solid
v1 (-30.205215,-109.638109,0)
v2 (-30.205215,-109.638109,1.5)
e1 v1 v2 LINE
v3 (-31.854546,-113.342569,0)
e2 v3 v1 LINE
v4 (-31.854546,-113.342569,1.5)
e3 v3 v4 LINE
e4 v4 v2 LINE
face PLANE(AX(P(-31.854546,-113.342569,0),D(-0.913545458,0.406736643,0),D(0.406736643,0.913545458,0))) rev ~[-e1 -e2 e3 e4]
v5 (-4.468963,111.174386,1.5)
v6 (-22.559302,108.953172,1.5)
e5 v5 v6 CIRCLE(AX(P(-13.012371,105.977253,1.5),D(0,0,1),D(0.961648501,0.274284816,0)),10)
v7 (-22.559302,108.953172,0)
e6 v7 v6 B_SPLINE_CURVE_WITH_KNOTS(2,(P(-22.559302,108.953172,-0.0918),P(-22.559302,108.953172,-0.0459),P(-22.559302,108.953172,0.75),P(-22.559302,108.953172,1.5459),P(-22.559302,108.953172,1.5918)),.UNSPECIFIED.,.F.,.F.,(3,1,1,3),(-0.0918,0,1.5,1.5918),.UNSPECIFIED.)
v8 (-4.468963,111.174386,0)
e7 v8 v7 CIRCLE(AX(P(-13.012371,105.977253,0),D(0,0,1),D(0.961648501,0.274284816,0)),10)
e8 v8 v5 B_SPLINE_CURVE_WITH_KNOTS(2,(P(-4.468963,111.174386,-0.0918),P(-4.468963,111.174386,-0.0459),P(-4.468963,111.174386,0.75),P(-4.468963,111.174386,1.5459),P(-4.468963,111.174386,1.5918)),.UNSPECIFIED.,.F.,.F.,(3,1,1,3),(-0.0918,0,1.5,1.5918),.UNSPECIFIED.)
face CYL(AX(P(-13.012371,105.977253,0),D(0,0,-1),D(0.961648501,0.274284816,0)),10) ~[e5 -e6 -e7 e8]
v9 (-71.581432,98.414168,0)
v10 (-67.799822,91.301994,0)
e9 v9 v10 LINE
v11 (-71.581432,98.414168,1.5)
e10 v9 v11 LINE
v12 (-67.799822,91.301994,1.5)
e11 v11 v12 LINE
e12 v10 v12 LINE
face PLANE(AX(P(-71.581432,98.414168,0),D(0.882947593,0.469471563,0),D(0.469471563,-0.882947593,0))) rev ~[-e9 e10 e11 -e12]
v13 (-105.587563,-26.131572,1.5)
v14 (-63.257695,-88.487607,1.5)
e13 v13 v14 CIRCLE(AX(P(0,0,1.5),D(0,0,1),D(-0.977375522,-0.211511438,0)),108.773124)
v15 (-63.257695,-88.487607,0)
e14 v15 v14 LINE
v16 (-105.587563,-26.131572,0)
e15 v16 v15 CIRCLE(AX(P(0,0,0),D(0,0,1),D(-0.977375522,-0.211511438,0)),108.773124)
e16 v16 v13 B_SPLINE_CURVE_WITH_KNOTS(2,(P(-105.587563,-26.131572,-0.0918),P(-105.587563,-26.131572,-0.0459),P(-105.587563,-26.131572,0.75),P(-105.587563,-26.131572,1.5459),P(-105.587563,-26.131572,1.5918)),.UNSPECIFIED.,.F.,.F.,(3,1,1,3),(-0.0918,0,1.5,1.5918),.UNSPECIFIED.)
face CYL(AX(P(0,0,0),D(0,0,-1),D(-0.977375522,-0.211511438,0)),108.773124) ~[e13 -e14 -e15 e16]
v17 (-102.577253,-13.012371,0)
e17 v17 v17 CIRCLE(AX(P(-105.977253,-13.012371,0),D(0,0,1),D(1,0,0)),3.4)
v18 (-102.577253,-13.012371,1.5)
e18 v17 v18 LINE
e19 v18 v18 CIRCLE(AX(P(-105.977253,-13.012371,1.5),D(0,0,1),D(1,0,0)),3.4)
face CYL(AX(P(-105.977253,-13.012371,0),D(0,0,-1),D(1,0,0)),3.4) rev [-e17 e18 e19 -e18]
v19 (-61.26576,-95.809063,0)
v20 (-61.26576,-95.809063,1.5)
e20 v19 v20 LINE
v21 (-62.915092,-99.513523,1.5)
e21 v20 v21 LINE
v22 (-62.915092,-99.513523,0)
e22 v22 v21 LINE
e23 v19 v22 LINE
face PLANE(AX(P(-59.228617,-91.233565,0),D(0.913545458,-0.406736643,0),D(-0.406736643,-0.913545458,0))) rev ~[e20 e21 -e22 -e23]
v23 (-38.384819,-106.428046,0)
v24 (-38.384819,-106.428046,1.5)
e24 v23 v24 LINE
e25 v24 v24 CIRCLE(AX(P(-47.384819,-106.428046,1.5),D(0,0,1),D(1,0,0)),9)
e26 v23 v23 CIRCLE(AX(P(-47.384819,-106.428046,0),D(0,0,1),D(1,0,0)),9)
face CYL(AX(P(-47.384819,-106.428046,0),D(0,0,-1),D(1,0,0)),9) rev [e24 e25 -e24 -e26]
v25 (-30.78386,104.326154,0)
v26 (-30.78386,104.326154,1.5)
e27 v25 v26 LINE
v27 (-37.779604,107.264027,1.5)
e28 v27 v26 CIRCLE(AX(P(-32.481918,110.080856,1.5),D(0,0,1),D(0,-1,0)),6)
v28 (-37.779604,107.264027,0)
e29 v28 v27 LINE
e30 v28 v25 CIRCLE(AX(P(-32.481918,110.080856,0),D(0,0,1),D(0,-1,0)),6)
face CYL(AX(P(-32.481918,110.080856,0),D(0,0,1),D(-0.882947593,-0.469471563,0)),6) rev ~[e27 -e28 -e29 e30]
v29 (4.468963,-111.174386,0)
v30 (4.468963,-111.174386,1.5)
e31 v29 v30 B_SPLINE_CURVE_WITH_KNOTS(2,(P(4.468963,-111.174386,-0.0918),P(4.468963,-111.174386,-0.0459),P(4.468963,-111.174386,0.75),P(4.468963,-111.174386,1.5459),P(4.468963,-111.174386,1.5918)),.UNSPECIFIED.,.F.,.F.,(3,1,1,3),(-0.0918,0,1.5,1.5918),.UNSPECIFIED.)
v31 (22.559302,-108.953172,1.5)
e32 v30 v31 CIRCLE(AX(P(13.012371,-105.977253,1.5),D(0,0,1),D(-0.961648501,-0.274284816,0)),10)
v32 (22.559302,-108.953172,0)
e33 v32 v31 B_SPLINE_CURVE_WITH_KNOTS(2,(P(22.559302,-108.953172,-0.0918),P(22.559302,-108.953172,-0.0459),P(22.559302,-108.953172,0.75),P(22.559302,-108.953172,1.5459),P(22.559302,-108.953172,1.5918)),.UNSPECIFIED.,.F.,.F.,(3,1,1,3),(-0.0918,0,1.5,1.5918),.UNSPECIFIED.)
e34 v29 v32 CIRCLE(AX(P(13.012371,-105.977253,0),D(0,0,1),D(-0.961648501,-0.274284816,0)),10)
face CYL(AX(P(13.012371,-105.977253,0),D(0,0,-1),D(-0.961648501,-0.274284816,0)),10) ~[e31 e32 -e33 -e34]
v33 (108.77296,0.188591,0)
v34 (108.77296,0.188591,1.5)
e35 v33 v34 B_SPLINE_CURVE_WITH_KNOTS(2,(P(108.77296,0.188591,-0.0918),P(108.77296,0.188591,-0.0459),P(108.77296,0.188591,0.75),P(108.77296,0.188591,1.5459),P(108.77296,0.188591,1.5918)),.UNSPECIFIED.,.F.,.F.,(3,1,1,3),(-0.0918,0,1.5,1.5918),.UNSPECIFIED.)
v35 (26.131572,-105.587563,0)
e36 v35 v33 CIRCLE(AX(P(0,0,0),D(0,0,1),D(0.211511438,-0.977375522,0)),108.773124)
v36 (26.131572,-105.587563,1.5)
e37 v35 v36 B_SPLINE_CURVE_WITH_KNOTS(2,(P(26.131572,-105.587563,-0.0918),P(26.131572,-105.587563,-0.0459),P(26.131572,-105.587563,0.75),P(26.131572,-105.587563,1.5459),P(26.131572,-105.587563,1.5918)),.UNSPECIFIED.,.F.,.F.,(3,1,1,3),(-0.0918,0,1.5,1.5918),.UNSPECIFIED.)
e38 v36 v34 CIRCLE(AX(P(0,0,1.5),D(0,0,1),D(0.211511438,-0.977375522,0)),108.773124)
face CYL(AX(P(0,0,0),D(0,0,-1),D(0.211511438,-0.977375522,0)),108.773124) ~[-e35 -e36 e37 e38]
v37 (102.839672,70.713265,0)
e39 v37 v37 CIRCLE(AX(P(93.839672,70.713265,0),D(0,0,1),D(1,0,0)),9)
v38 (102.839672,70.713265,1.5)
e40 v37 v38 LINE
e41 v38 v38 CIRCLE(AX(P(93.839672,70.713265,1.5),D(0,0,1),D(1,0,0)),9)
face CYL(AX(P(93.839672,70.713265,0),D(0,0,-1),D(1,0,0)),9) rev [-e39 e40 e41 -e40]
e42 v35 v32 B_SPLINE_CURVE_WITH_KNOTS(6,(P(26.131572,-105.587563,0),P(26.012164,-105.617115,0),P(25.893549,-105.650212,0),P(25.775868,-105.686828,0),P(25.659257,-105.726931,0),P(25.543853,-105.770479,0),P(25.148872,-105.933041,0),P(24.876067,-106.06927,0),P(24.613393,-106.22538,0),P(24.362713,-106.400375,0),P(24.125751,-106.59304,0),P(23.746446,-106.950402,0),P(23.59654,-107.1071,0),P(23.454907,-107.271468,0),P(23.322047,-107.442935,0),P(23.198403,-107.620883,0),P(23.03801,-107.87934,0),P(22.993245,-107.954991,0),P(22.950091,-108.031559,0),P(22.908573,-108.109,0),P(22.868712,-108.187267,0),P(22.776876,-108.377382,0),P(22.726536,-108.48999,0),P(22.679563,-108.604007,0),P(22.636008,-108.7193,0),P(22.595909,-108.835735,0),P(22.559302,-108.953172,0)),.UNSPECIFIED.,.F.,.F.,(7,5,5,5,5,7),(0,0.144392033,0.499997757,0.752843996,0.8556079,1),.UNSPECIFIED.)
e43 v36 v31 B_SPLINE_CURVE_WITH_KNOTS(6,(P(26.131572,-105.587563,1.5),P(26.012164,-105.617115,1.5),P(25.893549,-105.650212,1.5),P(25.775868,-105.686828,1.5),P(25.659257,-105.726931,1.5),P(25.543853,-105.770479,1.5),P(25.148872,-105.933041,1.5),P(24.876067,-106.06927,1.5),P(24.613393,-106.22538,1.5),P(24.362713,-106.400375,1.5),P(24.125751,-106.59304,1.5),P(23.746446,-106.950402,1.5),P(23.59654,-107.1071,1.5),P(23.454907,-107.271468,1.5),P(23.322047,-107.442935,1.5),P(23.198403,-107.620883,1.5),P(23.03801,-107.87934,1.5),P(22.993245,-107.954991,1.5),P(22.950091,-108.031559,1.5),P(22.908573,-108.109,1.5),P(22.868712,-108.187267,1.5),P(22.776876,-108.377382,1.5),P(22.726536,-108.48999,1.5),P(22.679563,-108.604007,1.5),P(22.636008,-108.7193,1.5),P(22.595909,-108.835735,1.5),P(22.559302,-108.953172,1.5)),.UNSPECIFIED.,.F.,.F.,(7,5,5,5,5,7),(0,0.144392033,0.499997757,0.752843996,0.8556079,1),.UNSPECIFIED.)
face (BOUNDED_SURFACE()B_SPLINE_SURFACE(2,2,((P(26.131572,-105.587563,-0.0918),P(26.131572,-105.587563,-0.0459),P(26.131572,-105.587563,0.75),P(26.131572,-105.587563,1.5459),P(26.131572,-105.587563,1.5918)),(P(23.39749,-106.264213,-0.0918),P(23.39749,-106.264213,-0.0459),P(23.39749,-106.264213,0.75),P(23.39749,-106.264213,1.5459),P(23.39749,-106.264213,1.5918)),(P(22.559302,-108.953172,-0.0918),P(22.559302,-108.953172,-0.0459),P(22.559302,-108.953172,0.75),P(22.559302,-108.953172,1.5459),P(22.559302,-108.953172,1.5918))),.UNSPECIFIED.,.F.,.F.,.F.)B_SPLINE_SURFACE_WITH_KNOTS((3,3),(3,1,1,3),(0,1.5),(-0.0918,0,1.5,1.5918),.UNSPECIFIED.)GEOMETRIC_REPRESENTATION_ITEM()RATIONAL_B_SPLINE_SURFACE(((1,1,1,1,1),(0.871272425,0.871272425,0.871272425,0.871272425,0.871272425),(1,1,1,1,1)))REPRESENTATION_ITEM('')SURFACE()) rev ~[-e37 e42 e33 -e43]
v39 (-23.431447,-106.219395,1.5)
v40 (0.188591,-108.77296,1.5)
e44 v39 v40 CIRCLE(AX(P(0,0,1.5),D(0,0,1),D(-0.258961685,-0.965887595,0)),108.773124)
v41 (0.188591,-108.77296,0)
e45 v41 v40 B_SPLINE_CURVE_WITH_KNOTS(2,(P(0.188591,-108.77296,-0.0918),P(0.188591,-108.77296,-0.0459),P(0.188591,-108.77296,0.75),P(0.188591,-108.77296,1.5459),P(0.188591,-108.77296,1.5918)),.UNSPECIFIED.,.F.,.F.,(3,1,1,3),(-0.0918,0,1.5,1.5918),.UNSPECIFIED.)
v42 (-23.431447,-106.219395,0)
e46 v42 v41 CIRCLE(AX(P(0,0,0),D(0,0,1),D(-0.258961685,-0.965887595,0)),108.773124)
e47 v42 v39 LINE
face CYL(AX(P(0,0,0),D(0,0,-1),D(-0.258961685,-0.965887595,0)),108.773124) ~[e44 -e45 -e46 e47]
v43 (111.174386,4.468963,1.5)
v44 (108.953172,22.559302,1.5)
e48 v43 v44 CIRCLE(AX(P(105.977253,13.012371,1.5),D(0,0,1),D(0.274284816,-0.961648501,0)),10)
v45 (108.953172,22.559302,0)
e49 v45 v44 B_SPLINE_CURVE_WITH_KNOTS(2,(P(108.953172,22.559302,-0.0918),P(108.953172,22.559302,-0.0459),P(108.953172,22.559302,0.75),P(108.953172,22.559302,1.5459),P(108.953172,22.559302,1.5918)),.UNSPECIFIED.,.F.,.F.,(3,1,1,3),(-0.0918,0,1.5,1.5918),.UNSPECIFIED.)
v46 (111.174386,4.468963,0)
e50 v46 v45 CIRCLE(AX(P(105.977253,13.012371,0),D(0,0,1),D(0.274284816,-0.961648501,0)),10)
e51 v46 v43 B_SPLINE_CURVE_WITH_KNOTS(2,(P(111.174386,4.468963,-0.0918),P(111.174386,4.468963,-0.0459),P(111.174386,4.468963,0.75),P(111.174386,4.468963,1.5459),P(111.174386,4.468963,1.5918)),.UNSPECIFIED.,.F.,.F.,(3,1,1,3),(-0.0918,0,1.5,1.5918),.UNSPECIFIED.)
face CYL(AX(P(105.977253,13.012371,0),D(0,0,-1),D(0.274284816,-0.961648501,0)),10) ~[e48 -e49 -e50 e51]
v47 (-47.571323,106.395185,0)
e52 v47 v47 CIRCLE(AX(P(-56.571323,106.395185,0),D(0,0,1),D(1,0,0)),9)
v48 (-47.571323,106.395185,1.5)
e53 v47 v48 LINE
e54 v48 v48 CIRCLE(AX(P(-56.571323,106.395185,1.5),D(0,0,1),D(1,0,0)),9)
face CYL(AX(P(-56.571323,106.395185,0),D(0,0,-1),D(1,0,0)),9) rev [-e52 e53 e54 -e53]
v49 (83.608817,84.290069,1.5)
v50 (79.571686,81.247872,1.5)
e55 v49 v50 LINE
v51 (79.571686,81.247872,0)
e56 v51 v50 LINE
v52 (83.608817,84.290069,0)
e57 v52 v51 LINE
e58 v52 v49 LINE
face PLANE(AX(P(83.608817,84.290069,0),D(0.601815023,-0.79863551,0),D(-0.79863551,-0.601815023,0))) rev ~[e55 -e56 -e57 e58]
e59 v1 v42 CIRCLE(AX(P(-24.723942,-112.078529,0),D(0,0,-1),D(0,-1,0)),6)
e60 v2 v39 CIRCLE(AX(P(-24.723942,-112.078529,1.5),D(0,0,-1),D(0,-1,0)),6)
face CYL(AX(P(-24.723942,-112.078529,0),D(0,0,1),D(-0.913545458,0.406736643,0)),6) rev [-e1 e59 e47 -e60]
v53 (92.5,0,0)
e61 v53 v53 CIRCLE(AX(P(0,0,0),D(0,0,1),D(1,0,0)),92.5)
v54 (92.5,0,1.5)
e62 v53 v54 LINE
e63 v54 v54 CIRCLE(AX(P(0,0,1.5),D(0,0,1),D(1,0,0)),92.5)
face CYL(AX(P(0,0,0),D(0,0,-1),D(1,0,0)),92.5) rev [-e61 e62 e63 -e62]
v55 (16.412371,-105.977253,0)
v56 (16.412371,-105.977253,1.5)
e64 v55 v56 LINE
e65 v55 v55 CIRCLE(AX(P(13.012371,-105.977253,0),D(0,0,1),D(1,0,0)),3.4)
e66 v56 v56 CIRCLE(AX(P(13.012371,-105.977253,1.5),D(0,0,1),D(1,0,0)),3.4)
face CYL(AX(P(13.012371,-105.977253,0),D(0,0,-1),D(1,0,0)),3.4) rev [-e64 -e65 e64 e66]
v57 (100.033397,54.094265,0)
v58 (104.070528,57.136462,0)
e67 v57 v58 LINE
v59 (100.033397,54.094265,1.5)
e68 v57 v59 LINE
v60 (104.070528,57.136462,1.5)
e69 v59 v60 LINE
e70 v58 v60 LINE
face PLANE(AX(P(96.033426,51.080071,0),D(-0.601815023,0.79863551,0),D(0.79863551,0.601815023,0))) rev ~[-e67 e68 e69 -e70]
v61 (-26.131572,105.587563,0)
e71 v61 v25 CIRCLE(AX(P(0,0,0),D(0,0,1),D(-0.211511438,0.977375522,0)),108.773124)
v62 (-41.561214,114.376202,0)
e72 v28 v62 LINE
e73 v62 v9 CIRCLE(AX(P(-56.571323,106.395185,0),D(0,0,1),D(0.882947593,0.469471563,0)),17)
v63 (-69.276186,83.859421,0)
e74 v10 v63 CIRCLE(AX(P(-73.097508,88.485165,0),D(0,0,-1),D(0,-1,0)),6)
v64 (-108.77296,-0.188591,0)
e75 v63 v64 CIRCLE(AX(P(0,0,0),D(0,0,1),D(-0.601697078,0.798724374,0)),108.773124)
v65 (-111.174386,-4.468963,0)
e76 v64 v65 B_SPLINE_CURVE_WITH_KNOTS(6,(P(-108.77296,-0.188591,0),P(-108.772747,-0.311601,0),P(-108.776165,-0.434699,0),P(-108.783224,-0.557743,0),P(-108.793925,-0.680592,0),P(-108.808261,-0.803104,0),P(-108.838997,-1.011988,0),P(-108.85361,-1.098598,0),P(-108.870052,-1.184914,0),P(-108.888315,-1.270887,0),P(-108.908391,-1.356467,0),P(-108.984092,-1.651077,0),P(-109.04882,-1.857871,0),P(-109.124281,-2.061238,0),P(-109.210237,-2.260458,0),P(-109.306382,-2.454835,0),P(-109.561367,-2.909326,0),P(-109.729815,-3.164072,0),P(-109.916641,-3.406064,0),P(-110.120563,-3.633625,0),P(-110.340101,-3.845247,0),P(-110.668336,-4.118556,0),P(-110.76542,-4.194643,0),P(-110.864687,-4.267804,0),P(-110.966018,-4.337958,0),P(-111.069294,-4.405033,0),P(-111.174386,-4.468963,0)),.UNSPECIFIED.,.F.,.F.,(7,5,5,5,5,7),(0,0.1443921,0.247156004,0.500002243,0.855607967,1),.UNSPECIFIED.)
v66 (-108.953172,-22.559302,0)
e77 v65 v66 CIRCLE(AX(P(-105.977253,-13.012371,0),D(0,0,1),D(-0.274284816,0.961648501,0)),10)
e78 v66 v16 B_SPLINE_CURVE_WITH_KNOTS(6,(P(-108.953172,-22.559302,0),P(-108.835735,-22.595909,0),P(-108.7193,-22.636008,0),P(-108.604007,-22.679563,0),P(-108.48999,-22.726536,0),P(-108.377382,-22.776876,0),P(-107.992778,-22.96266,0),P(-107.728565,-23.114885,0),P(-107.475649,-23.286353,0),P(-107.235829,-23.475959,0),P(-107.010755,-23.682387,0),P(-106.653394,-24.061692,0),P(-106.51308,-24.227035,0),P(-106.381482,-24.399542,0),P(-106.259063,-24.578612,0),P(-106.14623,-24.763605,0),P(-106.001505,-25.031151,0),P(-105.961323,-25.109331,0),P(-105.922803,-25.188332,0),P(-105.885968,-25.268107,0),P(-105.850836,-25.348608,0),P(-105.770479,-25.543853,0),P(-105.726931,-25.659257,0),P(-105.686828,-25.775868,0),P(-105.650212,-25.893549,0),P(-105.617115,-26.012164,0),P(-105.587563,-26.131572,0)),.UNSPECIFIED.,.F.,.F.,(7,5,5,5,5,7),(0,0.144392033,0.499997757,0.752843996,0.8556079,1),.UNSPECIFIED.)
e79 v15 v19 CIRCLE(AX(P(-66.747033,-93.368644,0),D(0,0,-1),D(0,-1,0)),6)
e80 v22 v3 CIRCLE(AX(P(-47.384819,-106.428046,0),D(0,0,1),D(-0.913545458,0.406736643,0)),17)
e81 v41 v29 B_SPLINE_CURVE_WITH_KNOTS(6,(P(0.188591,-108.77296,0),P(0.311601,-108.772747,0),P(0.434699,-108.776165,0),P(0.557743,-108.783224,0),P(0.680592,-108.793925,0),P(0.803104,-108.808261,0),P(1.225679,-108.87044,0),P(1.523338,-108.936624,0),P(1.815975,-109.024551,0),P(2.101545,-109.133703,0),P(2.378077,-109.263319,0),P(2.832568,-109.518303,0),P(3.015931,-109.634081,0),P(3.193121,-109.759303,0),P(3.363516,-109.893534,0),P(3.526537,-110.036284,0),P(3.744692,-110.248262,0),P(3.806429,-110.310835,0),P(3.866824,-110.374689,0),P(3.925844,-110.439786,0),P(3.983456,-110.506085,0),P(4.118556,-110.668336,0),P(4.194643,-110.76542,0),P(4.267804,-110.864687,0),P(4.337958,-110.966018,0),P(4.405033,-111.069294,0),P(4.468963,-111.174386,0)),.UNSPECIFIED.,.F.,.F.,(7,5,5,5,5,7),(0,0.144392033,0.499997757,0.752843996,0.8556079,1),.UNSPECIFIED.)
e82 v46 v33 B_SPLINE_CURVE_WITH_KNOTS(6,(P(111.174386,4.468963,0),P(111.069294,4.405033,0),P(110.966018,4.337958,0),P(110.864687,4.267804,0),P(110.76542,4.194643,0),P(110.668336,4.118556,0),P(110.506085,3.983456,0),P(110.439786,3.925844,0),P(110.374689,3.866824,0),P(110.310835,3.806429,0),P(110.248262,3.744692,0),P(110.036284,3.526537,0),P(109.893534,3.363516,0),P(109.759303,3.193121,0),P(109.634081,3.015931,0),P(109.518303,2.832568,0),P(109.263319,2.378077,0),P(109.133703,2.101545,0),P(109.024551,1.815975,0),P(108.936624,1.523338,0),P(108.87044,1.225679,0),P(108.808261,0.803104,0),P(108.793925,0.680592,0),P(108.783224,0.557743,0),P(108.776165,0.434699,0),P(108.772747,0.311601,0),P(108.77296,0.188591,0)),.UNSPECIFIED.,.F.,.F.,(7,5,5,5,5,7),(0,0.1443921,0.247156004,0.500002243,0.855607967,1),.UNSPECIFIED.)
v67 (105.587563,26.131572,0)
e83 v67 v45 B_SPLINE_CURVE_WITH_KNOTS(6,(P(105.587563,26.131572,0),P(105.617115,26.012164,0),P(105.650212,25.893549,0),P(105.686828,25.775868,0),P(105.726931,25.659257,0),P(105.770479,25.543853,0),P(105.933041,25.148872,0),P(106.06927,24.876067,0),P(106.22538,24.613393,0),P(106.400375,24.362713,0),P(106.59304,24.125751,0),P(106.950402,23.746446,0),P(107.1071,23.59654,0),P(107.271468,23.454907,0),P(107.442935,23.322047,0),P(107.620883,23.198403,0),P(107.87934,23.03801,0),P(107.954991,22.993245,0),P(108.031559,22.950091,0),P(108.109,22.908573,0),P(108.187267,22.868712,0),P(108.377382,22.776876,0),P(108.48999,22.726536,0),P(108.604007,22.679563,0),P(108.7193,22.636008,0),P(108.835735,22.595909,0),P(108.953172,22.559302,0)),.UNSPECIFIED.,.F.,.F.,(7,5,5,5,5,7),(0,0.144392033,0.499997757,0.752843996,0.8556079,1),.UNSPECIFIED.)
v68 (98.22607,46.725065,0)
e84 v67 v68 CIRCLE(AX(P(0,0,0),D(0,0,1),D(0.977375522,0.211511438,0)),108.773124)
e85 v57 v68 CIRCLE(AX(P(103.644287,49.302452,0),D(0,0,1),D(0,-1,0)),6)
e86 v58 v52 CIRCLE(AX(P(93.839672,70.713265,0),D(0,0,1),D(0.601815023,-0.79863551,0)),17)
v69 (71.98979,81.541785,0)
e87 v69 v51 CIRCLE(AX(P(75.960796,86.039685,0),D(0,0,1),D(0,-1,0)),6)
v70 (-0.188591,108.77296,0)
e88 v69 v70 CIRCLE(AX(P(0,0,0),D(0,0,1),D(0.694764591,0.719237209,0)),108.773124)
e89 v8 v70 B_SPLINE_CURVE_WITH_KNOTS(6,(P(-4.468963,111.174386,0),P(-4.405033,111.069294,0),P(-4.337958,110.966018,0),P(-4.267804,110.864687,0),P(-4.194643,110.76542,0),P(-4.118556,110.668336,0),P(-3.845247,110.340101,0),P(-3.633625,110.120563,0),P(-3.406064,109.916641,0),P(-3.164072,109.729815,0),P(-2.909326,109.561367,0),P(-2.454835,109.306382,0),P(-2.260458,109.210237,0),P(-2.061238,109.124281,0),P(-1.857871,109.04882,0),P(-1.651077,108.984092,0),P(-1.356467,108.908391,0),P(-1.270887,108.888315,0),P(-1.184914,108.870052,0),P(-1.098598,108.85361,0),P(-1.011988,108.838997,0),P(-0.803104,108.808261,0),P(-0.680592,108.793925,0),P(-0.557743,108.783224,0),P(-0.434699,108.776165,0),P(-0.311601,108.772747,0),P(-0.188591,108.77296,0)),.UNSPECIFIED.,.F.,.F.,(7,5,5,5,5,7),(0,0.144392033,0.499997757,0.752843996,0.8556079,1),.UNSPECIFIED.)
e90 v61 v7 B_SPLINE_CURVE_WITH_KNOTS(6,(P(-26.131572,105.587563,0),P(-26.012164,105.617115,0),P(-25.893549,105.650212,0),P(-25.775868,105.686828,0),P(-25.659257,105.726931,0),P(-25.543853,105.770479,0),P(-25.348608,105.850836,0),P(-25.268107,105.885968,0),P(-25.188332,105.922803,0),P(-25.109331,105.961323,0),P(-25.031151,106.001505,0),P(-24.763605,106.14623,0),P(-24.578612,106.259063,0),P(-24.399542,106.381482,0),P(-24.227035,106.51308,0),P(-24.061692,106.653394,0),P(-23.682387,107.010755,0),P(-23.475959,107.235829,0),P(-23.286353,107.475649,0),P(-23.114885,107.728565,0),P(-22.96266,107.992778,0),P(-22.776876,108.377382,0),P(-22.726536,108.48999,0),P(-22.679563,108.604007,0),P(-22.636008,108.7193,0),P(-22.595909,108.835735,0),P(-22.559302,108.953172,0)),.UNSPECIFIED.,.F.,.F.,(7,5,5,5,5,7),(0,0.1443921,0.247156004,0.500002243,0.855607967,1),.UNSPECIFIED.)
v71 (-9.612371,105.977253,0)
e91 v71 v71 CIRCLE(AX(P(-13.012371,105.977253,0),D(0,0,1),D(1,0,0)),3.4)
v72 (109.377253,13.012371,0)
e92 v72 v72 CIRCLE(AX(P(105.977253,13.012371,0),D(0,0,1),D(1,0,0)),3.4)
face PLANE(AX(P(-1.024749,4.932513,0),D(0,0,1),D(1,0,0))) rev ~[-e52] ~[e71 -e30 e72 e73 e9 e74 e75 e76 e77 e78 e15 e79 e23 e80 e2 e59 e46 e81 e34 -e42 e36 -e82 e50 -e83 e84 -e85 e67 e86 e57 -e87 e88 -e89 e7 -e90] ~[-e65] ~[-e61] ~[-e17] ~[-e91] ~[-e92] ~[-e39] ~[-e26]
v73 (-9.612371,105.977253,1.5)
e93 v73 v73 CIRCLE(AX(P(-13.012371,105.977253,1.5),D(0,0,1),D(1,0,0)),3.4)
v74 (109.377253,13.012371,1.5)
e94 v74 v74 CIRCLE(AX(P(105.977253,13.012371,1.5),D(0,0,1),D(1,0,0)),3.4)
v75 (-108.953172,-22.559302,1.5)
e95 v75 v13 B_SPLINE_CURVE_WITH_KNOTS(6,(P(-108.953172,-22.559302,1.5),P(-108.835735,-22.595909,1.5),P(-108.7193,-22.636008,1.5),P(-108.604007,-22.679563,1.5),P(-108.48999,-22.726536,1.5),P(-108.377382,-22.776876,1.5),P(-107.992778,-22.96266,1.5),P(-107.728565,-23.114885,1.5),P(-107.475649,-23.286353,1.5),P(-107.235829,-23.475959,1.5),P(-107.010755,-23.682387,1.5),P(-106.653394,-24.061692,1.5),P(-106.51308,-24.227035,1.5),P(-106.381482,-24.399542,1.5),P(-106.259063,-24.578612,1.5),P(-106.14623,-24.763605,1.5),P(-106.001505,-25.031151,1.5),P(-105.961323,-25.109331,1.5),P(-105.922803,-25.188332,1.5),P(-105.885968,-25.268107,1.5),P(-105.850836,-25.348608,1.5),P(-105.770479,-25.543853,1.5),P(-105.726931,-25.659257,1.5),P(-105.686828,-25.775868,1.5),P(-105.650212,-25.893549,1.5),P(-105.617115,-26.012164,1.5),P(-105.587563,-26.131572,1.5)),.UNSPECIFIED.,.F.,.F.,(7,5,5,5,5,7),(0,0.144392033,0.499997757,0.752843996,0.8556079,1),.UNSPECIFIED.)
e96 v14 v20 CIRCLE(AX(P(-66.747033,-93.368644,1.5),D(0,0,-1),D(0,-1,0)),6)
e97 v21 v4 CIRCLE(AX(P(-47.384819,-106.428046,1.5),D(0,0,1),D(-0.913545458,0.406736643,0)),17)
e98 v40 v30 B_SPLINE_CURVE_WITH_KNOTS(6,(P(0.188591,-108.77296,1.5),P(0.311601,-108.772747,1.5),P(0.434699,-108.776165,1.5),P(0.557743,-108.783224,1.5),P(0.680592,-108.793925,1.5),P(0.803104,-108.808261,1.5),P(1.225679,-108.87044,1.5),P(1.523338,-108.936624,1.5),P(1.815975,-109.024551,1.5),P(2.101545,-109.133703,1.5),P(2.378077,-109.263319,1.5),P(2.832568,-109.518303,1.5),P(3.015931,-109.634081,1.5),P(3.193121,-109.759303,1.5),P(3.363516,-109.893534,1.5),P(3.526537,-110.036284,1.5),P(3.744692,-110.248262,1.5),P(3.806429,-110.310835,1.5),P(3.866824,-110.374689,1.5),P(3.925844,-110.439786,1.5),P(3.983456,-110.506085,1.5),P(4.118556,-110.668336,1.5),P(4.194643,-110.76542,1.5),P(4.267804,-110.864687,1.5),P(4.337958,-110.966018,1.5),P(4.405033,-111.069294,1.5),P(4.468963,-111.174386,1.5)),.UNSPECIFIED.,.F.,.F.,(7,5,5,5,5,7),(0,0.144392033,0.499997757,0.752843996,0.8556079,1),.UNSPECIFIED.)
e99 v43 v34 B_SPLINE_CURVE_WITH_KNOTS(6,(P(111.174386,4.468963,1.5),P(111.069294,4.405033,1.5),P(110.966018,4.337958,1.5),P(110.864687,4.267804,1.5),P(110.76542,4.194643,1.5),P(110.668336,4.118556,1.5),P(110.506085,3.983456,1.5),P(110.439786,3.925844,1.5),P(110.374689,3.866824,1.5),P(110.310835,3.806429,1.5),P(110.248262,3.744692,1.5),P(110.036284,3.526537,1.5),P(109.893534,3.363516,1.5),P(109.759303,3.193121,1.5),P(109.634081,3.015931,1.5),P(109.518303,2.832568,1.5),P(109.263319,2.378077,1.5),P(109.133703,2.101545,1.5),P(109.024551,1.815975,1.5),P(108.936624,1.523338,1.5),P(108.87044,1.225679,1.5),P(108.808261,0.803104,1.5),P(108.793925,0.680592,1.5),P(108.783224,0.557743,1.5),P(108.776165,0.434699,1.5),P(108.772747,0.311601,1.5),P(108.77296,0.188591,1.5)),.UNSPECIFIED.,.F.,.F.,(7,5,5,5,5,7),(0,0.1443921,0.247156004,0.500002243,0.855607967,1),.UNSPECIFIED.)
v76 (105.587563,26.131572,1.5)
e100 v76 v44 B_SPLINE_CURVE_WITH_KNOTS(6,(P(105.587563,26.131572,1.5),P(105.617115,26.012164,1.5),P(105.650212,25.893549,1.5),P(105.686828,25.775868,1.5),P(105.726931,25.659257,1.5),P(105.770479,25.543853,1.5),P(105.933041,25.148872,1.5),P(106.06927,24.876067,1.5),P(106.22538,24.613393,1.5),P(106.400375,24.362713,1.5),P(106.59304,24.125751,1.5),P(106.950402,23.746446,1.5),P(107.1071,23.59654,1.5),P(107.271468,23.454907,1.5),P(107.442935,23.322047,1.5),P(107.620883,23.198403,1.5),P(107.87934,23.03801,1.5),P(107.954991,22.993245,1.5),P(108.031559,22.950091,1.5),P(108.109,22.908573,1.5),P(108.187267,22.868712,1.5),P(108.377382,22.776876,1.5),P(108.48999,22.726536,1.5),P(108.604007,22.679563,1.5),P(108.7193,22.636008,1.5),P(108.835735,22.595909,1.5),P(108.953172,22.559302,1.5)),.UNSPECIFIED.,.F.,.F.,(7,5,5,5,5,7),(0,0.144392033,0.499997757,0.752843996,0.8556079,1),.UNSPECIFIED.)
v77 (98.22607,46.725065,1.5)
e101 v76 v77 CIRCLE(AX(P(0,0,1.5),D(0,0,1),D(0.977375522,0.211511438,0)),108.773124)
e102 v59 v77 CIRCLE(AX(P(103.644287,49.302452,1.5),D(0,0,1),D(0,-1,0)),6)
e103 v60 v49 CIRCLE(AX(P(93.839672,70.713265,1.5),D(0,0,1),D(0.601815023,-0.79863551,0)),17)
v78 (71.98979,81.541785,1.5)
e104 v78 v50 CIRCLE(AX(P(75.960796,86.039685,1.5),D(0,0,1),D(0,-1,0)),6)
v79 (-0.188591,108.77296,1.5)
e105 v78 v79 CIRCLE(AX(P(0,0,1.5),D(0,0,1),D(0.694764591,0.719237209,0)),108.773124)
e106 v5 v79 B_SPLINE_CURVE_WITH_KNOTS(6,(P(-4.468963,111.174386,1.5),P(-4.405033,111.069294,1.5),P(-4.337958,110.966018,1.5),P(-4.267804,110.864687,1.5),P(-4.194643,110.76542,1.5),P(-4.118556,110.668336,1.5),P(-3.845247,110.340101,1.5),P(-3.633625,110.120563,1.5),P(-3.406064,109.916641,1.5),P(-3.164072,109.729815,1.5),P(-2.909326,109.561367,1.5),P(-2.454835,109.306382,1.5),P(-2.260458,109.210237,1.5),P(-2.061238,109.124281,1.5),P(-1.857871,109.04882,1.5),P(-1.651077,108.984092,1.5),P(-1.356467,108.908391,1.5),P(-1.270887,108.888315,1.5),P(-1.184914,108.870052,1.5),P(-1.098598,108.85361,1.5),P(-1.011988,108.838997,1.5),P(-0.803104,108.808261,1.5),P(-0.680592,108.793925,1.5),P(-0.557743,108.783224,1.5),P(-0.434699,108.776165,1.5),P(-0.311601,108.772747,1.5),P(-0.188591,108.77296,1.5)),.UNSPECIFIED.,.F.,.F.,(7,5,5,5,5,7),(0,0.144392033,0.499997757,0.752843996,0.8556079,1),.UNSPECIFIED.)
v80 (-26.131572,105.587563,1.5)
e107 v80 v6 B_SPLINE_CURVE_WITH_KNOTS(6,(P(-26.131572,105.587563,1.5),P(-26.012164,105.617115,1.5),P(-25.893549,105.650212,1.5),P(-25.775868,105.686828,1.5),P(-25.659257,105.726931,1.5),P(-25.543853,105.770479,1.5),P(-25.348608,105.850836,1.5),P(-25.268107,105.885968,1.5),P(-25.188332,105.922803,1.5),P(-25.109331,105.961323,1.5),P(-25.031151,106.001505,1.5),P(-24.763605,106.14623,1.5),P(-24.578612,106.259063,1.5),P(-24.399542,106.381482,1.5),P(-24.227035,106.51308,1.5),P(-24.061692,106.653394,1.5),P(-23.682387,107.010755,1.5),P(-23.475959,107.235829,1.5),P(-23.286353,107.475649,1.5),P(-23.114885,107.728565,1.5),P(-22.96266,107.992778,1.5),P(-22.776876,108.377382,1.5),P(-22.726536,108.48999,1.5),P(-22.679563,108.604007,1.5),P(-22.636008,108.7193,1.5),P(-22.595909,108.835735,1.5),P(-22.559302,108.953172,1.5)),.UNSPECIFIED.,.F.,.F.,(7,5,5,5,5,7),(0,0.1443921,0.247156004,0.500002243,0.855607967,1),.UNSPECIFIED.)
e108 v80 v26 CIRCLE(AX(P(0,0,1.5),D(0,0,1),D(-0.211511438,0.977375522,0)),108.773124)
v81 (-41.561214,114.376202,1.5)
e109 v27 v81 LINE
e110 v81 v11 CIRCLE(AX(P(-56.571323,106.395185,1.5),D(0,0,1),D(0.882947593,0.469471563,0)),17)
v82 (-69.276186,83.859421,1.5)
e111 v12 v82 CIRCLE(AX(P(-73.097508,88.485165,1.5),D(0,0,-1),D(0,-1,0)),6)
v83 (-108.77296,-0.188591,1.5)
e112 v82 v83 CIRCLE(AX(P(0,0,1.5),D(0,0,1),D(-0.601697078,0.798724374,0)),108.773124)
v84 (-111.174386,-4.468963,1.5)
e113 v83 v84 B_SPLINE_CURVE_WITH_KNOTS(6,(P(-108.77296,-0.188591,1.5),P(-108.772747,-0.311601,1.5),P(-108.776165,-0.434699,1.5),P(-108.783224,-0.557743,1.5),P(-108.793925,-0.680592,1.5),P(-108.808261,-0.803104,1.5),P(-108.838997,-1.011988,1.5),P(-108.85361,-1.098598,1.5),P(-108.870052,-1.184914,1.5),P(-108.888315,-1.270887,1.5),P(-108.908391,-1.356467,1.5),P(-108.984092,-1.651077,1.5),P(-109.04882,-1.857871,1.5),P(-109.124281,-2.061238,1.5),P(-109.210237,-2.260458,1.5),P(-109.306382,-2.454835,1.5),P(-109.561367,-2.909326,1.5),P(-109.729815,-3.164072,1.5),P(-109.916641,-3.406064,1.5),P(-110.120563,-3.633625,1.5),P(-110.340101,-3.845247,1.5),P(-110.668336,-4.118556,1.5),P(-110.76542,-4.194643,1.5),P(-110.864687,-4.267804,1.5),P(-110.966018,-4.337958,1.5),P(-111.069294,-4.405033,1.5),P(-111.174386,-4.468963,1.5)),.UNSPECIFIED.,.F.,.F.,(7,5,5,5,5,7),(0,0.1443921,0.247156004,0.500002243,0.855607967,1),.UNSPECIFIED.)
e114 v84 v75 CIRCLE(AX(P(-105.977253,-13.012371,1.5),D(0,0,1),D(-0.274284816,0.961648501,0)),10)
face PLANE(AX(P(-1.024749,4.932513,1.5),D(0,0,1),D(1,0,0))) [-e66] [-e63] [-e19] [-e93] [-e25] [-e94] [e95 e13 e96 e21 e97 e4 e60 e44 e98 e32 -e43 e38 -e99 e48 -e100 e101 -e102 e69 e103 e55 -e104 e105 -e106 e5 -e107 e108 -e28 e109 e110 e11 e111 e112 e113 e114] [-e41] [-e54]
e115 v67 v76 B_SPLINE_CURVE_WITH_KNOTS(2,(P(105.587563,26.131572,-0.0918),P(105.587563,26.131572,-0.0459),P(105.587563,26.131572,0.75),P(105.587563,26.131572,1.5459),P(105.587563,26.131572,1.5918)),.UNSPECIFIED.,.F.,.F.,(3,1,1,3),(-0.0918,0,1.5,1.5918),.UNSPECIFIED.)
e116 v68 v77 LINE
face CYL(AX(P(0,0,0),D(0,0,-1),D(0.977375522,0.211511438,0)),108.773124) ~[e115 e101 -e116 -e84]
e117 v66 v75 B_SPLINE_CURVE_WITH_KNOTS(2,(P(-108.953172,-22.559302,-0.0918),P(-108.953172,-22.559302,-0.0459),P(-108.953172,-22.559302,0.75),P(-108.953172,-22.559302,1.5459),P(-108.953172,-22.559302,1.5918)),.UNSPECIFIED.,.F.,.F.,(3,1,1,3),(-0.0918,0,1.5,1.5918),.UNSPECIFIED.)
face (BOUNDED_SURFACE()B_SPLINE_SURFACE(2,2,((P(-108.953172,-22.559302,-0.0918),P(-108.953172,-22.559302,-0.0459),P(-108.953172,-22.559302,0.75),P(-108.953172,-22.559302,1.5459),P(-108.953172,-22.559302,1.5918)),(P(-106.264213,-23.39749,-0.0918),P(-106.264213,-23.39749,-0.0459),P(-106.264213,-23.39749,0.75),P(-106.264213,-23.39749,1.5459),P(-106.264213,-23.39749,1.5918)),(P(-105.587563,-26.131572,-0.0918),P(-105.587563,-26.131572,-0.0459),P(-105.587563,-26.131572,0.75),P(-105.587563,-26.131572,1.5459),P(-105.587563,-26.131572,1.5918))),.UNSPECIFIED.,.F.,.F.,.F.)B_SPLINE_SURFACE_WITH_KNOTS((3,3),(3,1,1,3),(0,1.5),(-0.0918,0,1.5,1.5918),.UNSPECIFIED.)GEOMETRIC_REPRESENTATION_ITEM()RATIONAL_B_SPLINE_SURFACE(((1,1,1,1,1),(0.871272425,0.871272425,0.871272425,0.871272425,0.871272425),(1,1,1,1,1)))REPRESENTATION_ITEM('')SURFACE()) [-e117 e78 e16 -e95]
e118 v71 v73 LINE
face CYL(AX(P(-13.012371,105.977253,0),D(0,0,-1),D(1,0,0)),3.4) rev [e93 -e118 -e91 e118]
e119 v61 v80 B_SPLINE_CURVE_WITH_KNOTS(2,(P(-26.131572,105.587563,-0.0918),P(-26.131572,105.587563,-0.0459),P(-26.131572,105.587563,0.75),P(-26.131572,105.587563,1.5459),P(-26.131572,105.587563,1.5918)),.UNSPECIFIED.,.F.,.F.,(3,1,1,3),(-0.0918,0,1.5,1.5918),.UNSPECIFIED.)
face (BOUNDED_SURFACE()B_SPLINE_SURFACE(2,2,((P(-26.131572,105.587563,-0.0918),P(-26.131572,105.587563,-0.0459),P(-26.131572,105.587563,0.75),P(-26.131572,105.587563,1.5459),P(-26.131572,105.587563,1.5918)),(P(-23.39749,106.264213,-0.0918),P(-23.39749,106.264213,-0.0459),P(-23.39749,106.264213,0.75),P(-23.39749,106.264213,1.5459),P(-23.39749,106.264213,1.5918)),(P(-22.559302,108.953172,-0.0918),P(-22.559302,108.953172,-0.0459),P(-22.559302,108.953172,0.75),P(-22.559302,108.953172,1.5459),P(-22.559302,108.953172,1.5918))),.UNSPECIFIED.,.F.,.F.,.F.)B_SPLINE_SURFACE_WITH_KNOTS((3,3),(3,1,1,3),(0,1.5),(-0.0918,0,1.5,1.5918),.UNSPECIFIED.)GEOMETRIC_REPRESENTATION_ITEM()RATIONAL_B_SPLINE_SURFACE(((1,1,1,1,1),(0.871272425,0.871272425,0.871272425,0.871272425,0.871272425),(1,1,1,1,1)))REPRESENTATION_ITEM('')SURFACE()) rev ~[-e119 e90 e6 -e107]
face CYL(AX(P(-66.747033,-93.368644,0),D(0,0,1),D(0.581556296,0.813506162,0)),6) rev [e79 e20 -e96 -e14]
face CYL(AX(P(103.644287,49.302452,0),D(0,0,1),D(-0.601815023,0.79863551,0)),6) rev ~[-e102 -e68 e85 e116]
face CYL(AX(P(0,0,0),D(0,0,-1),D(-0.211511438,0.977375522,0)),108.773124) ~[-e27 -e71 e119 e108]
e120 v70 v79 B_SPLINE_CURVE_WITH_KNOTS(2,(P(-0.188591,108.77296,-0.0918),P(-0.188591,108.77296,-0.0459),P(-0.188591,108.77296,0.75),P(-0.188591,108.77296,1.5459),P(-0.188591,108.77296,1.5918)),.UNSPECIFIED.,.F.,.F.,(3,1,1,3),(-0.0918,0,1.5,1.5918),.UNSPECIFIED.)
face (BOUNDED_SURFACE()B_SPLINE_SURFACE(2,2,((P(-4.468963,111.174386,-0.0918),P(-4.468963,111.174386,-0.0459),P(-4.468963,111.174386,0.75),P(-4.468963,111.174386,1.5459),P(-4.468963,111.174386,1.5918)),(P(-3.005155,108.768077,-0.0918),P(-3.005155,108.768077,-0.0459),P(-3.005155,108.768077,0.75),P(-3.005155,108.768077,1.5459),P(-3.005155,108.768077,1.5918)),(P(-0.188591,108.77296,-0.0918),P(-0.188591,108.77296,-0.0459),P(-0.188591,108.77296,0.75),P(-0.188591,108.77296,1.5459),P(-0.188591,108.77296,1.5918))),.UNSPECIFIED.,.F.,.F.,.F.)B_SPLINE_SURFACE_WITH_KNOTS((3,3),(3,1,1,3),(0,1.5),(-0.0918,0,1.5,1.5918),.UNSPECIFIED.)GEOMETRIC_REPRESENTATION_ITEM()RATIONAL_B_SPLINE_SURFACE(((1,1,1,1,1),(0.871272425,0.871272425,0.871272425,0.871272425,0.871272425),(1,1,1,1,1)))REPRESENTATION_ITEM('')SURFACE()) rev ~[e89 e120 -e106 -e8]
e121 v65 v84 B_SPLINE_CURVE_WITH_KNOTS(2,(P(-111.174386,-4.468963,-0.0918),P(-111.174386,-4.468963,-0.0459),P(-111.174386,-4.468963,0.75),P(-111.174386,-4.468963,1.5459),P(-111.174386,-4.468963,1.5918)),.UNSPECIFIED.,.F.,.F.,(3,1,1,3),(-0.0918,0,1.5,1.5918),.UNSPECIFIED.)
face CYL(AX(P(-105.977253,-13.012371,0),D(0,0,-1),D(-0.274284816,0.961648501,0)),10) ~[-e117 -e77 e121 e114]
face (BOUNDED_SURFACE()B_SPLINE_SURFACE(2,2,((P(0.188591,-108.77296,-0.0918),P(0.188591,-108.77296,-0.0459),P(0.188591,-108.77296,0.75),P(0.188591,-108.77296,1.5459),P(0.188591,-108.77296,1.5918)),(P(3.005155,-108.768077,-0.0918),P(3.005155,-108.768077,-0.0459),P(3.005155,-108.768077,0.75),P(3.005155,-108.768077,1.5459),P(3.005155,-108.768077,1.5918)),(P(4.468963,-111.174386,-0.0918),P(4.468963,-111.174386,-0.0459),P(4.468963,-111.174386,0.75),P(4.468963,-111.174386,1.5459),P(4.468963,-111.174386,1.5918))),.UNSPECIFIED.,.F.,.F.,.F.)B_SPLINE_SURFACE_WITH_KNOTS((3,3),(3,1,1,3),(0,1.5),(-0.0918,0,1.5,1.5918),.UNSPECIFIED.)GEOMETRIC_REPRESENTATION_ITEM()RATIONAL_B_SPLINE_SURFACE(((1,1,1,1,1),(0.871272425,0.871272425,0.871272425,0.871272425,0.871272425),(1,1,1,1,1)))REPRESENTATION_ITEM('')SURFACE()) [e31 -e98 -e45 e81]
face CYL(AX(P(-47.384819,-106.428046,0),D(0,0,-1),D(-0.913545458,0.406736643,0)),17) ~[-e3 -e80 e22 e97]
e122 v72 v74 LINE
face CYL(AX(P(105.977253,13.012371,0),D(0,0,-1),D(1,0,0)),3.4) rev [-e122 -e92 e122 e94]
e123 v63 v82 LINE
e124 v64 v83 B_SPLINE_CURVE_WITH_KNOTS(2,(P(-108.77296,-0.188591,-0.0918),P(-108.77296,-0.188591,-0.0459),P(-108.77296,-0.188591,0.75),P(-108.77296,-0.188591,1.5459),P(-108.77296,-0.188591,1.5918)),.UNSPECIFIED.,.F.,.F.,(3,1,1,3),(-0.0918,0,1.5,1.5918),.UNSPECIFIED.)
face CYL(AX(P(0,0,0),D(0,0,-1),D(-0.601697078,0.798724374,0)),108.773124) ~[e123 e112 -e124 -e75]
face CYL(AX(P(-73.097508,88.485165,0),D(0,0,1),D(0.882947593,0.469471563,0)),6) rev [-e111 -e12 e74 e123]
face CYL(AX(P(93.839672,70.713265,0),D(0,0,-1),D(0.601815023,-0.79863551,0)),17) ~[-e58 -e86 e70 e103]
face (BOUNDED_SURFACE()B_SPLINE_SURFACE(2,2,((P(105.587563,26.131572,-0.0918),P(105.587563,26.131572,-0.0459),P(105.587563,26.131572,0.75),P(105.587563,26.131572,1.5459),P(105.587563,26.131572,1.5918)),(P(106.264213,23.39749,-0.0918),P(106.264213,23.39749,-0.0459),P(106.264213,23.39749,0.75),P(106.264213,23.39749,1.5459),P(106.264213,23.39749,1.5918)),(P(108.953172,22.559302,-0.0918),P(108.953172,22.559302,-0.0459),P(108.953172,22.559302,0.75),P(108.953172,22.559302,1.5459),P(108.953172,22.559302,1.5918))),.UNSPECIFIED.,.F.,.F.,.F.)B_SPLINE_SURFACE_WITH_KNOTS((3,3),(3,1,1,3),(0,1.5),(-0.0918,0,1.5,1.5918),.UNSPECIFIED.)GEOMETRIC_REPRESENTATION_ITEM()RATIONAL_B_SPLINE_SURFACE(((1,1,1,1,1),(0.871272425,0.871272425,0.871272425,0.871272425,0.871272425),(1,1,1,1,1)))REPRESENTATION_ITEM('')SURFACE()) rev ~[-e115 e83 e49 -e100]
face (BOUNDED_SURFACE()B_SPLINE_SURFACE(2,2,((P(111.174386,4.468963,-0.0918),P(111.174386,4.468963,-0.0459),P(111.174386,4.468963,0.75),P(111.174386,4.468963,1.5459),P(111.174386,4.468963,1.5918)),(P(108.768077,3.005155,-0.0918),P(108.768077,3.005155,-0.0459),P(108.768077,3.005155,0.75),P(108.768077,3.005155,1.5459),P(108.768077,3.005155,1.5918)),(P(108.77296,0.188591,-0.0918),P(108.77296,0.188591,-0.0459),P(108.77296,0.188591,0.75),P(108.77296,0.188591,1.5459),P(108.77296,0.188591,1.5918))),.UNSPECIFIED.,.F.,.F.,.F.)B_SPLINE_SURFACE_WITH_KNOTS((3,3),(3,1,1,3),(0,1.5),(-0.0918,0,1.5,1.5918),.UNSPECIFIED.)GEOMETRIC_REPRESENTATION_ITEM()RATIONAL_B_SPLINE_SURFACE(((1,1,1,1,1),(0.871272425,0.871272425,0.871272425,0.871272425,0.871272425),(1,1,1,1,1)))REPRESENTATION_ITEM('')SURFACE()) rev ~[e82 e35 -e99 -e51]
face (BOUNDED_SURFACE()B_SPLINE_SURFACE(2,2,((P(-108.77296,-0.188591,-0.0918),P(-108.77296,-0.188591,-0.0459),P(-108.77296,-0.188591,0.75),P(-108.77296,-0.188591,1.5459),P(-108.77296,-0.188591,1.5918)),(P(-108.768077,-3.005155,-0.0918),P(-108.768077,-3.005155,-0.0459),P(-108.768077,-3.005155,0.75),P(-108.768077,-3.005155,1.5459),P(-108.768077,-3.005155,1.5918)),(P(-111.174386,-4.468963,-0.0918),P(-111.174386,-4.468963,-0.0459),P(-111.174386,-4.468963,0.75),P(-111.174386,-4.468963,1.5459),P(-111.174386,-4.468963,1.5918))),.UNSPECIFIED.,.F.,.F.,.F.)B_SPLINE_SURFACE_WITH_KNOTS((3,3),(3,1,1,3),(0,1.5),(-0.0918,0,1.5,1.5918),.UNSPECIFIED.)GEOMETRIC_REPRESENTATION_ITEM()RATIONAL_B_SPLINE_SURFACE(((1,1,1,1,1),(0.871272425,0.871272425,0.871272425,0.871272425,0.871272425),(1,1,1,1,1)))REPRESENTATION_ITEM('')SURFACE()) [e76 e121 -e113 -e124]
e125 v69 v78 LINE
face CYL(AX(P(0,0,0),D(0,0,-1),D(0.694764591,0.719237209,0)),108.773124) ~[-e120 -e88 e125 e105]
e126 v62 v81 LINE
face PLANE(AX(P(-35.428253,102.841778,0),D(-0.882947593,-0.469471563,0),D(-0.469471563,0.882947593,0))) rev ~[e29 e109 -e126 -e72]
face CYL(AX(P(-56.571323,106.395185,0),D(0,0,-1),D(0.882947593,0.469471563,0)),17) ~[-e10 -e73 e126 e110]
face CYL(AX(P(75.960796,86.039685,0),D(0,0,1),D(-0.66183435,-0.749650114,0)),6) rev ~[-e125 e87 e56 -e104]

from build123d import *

# Parameters (mm, degrees)
F0_R     = 9
F0_R_2   = 3.4
F0_R_3   = 92.5
F1_DEPTH = 1.5
F2_R     = 6
F3_R     = 5


# Not quite as in the source:
# - a feature names something its author has since deleted; it is built from what else it names


with BuildPart() as f1:
    # F0 (on Top) → F1 (new body)
    with BuildSketch(Plane.XY):
        with BuildLine():
            ThreePointArc((-41.5612142371, 114.3762015069), (-64.5523398831, 121.4052940181), (-71.5814323943, 98.4141683721))
            Line((-71.5814323943, 98.4141683721), (-65.4484708904, 86.8797453608))
            ThreePointArc((-65.4484708904, 86.8797453608), (-98.0871820311, 47.0159251428), (-108.7201014418, -3.3958854983))
            ThreePointArc((-108.7201014418, -3.3958854983), (-115.9027148008, -14.2310639443), (-106.3121888463, -23.0067598447))
            ThreePointArc((-106.3121888463, -23.0067598447), (-89.5246549559, -61.7812969341), (-59.2286170286, -91.2335652089))
            Line((-59.2286170286, -91.2335652089), (-62.9150916983, -99.5135228831))
            ThreePointArc((-62.9150916983, -99.5135228831), (-54.2993418506, -121.9583185953), (-31.8545461384, -113.3425687477))
            Line((-31.8545461384, -113.3425687477), (-28.1680714687, -105.0626110734))
            ThreePointArc((-28.1680714687, -105.0626110734), (-12.5203677417, -108.0501406174), (3.3958854983, -108.7201014418))
            ThreePointArc((3.3958854983, -108.7201014418), (14.2310639443, -115.9027148008), (23.0067598447, -106.3121888463))
            ThreePointArc((23.0067598447, -106.3121888463), (85.7143913832, -66.9674219725), (108.7201014418, 3.3958854983))
            ThreePointArc((108.7201014418, 3.3958854983), (115.9027148008, 14.2310639443), (106.3121888463, 23.0067598447))
            ThreePointArc((106.3121888463, 23.0067598447), (102.1418848281, 37.3982333755), (96.0334257824, 51.0800707549))
            Line((96.0334257824, 51.0800707549), (104.0705278241, 57.1364615496))
            ThreePointArc((104.0705278241, 57.1364615496), (107.4164761014, 80.944120614), (83.608817037, 84.2900688912))
            Line((83.608817037, 84.2900688912), (75.5717149953, 78.2336780965))
            ThreePointArc((75.5717149953, 78.2336780965), (39.1751591317, 101.4736389554), (-3.3958854983, 108.7201014418))
            ThreePointArc((-3.3958854983, 108.7201014418), (-14.2310639443, 115.9027148008), (-23.0067598447, 106.3121888463))
            ThreePointArc((-23.0067598447, 106.3121888463), (-29.2689871835, 104.7612470577), (-35.4282527332, 102.8417784955))
            Line((-35.4282527332, 102.8417784955), (-41.5612142371, 114.3762015069))
        make_face()
        with Locations((-47.3848189183, -106.4280458154)):
            Circle(F0_R, mode=Mode.SUBTRACT)
        with Locations((-105.9772532844, -13.0123705102)):
            Circle(F0_R_2, mode=Mode.SUBTRACT)
        with Locations((13.0123705102, -105.9772532844)):
            Circle(F0_R_2, mode=Mode.SUBTRACT)
        Circle(F0_R_3, mode=Mode.SUBTRACT)
        with Locations((-56.5713233157, 106.3951849395)):
            Circle(F0_R, mode=Mode.SUBTRACT)
        with Locations((-13.0123705102, 105.9772532844)):
            Circle(F0_R_2, mode=Mode.SUBTRACT)
        with Locations((105.9772532844, 13.0123705102)):
            Circle(F0_R_2, mode=Mode.SUBTRACT)
        with Locations((93.8396724306, 70.7132652204)):
            Circle(F0_R, mode=Mode.SUBTRACT)
    extrude(amount=F1_DEPTH)

    # F2
    f2_edges = [f1.edges().sort_by_distance(p)[0] for p in [
        (-65.448471, 86.879745, 0.75),
        (-59.228617, -91.233565, 0.75),
        (-28.168071, -105.062611, 0.75),
        (96.033426, 51.080071, 0.75),
        (75.571715, 78.233678, 0.75),
        (-35.428253, 102.841778, 0.75),
    ]]
    fillet(f2_edges, radius=F2_R)

    # F3
    f3_edges = [f1.edges().sort_by_distance(p)[0] for p in [
        (-108.720101, -3.395885, 0.75),
        (-106.312189, -23.00676, 0.75),
        (-23.00676, 106.312189, 0.75),
        (-3.395885, 108.720101, 0.75),
        (3.395885, -108.720101, 0.75),
        (23.00676, -106.312189, 0.75),
        (108.720101, 3.395885, 0.75),
        (106.312189, 23.00676, 0.75),
    ]]
    fillet(f3_edges, radius=F3_R)


solid = f1.part
